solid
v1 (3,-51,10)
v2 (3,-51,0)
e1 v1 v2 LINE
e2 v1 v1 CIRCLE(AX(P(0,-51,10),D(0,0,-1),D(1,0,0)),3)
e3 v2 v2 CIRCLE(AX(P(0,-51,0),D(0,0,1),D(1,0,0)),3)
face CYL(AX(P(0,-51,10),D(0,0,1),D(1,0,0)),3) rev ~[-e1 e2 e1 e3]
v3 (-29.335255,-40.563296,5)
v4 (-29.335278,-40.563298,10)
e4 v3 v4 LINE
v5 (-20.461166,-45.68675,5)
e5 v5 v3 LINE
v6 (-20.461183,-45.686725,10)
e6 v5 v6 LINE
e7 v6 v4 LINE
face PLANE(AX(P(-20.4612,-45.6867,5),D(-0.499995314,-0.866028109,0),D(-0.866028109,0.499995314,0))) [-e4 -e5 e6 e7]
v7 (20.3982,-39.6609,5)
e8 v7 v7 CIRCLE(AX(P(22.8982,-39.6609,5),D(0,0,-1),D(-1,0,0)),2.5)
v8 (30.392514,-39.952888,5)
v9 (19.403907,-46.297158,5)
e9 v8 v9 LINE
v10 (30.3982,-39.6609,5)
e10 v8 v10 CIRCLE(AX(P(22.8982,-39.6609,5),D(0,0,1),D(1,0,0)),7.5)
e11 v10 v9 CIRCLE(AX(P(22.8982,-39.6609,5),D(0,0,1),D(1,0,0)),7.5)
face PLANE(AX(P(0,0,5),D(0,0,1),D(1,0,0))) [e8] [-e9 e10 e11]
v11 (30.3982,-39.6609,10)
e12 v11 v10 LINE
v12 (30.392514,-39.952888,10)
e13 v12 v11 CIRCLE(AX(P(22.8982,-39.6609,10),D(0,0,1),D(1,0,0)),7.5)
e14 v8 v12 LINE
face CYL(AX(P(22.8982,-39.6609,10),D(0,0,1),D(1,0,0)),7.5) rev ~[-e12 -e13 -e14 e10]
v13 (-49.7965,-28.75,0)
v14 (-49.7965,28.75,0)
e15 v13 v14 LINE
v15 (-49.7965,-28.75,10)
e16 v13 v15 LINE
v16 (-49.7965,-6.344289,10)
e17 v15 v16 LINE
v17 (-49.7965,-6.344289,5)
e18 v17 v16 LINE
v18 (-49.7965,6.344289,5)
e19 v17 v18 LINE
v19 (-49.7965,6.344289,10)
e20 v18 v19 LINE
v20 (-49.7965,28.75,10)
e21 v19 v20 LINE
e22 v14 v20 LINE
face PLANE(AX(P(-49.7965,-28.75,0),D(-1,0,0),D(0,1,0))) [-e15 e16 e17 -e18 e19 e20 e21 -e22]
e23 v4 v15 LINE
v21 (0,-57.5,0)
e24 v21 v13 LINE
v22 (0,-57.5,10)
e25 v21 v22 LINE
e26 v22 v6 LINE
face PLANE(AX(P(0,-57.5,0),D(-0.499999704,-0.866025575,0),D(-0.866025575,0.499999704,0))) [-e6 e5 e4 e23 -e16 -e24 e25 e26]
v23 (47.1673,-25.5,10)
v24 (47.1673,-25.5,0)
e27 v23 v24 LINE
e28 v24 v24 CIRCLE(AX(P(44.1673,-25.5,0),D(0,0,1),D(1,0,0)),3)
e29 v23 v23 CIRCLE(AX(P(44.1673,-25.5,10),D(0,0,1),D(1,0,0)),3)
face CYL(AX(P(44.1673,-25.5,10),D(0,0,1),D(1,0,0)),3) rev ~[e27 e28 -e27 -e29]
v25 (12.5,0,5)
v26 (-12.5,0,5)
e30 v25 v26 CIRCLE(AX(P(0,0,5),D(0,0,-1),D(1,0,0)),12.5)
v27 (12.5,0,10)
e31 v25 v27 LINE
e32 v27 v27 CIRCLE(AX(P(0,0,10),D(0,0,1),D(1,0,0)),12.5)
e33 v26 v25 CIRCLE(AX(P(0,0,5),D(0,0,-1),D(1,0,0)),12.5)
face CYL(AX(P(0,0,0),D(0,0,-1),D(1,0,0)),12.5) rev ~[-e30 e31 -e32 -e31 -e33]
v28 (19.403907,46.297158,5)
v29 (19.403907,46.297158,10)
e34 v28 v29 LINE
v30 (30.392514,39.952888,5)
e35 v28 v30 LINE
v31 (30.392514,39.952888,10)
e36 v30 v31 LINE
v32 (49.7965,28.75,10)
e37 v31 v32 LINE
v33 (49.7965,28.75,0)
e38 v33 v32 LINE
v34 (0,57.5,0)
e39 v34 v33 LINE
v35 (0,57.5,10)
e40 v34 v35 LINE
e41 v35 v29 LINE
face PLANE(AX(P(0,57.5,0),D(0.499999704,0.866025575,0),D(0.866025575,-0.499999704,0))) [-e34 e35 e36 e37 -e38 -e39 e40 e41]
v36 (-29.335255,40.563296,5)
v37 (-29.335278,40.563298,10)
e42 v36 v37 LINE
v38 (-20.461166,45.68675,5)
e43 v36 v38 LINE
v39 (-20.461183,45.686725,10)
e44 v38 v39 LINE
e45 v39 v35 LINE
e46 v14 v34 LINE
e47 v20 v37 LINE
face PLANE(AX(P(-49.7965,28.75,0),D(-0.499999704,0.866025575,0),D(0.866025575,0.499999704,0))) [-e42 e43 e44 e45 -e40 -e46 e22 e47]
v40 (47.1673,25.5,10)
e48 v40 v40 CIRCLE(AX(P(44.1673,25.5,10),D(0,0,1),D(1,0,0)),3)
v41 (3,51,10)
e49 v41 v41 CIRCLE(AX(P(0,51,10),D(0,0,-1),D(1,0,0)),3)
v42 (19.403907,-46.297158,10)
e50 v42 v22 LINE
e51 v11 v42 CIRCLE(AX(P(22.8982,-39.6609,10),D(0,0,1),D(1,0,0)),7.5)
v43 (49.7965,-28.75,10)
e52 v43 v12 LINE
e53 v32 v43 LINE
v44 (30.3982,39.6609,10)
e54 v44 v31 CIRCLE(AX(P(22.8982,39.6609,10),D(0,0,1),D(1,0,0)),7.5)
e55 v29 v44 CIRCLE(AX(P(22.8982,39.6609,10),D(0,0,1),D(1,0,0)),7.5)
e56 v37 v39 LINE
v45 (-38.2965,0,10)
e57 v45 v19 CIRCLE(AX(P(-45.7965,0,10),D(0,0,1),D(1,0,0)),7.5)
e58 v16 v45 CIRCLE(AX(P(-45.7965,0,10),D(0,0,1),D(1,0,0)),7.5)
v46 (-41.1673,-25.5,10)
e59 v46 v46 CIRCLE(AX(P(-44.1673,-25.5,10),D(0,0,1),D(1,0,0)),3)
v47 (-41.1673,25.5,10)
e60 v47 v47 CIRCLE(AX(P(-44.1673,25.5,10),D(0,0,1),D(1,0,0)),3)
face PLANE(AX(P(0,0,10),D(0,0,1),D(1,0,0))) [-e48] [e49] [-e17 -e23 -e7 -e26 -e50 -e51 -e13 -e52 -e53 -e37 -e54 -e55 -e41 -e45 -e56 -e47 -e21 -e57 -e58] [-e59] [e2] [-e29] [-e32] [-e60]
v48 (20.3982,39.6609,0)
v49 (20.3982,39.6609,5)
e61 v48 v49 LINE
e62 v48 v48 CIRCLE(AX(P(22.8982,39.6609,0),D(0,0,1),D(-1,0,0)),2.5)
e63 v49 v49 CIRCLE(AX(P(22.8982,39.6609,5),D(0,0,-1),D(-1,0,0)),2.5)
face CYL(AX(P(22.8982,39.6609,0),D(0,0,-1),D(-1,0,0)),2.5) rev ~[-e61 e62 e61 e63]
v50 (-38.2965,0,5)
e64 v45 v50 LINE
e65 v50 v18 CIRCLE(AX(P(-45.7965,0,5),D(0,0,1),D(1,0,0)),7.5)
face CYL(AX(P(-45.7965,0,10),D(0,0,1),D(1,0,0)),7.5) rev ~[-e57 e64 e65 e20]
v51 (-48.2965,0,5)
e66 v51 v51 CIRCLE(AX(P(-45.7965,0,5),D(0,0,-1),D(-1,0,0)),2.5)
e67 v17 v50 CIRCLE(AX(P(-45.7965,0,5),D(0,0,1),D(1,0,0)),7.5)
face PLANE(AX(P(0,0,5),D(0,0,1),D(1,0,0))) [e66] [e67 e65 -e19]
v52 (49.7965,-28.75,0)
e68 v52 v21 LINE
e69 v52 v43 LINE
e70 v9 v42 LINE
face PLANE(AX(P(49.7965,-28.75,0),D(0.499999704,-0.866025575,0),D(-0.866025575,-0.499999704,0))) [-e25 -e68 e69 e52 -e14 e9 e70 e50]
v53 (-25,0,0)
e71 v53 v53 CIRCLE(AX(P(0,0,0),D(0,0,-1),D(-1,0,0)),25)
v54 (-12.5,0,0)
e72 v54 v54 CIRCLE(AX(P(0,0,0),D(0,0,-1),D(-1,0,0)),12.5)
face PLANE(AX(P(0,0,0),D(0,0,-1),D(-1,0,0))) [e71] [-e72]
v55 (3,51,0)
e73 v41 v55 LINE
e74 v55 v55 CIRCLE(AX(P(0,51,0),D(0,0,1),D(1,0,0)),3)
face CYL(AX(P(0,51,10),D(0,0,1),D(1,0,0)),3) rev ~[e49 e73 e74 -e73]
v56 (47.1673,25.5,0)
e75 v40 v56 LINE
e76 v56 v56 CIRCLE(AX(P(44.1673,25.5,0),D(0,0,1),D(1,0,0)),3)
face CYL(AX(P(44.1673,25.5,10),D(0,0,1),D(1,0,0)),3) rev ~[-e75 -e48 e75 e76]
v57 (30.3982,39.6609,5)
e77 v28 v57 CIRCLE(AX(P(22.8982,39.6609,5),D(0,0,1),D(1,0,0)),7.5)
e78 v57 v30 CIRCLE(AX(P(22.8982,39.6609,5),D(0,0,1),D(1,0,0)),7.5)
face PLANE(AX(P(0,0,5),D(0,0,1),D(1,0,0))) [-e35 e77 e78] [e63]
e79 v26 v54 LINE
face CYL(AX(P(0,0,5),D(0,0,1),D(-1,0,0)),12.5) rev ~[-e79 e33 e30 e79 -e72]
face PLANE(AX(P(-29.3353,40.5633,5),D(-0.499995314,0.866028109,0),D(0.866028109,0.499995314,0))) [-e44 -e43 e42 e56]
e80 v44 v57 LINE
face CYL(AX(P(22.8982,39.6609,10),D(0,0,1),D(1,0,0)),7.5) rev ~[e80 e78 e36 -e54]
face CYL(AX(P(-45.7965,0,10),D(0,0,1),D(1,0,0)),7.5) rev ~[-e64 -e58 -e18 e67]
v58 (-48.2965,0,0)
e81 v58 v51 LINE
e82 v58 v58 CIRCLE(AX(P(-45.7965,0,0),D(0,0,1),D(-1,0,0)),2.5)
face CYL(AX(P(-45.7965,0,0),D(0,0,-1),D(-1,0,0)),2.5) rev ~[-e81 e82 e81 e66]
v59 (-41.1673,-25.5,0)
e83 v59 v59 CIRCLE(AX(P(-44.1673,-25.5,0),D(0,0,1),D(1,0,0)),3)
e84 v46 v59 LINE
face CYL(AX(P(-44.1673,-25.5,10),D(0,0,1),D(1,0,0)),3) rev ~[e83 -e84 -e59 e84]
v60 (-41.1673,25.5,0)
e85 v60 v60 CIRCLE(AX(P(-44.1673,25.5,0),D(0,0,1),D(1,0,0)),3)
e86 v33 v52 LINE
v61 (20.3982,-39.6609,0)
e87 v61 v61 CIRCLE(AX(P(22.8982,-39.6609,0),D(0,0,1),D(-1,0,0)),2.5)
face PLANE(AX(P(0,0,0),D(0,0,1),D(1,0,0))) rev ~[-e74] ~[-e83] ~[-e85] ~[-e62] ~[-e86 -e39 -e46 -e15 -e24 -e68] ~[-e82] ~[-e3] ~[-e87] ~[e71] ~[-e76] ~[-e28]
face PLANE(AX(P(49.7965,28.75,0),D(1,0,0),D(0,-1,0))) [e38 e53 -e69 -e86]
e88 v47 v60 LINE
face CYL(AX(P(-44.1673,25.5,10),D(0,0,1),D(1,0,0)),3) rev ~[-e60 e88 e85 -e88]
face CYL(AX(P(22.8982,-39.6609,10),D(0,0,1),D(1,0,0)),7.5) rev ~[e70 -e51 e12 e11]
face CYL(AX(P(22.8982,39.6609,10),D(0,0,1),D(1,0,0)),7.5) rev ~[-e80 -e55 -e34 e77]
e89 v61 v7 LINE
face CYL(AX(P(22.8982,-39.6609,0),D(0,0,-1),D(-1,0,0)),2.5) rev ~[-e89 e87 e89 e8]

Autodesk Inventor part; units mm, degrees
ref_plane "YZ Plane" through (0, 0, 0) normal (1, 0, 0) x (0, 1, 0)
ref_plane "XZ Plane" through (0, 0, 0) normal (0, 1, 0) x (-1, 0, 0)
ref_plane "XY Plane" through (0, 0, 0) normal (0, 0, 1) x (1, 0, 0)
sketch "Sketch1" plane through (0, 0, 0) normal (0, 0, 1) x (1, 0, 0)
  circle A0 centre (0, 0) radius 12.5
  circle A1 centre (-30, 0) radius 3
  circle A2 centre (-15, -25.9808) radius 3
  circle A3 centre (15, -25.9808) radius 3
  circle A4 centre (30, 0) radius 3
  circle A5 centre (15, 25.9808) radius 3
  circle A6 centre (-15, 25.9808) radius 3
  line L0 (0, 57.5) -> (49.7965, 28.75)
  line L1 (49.7965, 28.75) -> (49.7965, -28.75)
  line L2 (49.7965, -28.75) -> (0, -57.5)
  line L3 (0, -57.5) -> (-49.7965, -28.75)
  line L4 (-49.7965, -28.75) -> (-49.7965, 28.75)
  line L5 (-49.7965, 28.75) -> (0, 57.5)
  point P0 (49.7965, 0)
  dimension "d0" = 25
  dimension "d2" = 6
  dimension "d6" = 360
  dimension "d15" = 30
  dimension "d33" = 115
extrude "Extrusion1" add sketch "Sketch1" along normal blind 10 contours A1 | A2 | A3 | A4 | A5 | A6 | L0 L1 L2 L3 L4 L5
sketch "Sketch7" plane through (0, 0, 10) normal (0, 0, 1) x (1, 0, 0)
  circle A0 centre (0, 51) radius 3
  circle A1 centre (-44.1673, 25.5) radius 3
  circle A2 centre (-44.1673, -25.5) radius 3
  circle A3 centre (0, -51) radius 3
  circle A4 centre (44.1673, -25.5) radius 3
  circle A5 centre (44.1673, 25.5) radius 3
  line L0 (0, 51) -> (0, -51)
  point P0 (0, 0)
  dimension "d42" = 6
  dimension "d46" = 360
  dimension "d96" = 102
extrude "Extrusion6" cut sketch "Sketch7" against normal through all
sketch "Sketch9" plane through (0, 0, 0) normal (0, 0, -1) x (-1, 0, 0)
  circle A0 centre (0, 0) radius 25
  dimension "d56" = 50
extrude "Extrusion8" cut sketch "Sketch9" against normal blind 5
sketch "Sketch14" plane through (0, 0, 10) normal (0, 0, 1) x (1, 0, 0)
  circle A0 centre (-45.7965, 0) radius 2.5
  circle A1 centre (-22.8982, -39.6609) radius 2.5
  circle A2 centre (22.8982, -39.6609) radius 2.5
  circle A3 centre (45.7965, 0) radius 2.5
  circle A4 centre (22.8982, 39.6609) radius 2.5
  circle A5 centre (-22.8982, 39.6609) radius 2.5
  line L0 (-49.7965, 28.75) -> (-49.7965, -28.75) projected
  point P0 (0, 0)
  point P1 (-45.7965, 0)
  dimension "d81" = 5
  dimension "d85" = 360
  dimension "d97" = 4
extrude "Extrusion13" cut sketch "Sketch14" against normal through all
sketch "Sketch15" plane through (0, 0, 10) normal (0, 0, 1) x (1, 0, 0)
  circle A0 centre (-22.8982, 39.6609) radius 2.5 projected
  circle A1 centre (-22.8982, 39.6609) radius 6.5
  circle A2 centre (-45.7965, 0) radius 6.5
  circle A3 centre (-22.8982, -39.6609) radius 6.5
  circle A4 centre (22.8982, -39.6609) radius 6.5
  circle A5 centre (45.7965, 0) radius 6.5
  circle A6 centre (22.8982, 39.6609) radius 6.5
  point P0 (0, 0)
  dimension "d89" = 13
  dimension "d92" = 360
extrude "Extrusion14" cut sketch "Sketch15" against normal blind 5 contours A0 | A1 | A2 | A3 | A4 | A5 | A6
sketch "Sketch16" plane through (0, 0, 5) normal (0, 0, 1) x (1, 0, 0)
  line L0 (-29.3353, 40.5633) -> (-20.4612, 45.6867) projected
  arc A0 (-29.3353, 40.5633) -> (-20.4612, 45.6867) centre (-22.8982, 39.6609) ccw projected
  circle A1 centre (-22.8982, 39.6609) radius 2.5 projected
  line L1 (49.7965, 5.1235) -> (49.7965, -5.1235) projected
  arc A2 (49.7965, 5.1235) -> (49.7965, -5.1235) centre (45.7965, 0) ccw projected
  circle A3 centre (45.7965, 0) radius 2.5 projected
  line L2 (-20.4612, -45.6867) -> (-29.3353, -40.5633) projected
  arc A4 (-20.4612, -45.6867) -> (-29.3353, -40.5633) centre (-22.8982, -39.6609) ccw projected
  circle A5 centre (-22.8982, -39.6609) radius 2.5 projected
  point P0 (0, 0)
extrude "Extrusion15" add sketch "Sketch16" along normal blind 5
sketch "Sketch17" plane through (0, 0, 10) normal (0, 0, 1) x (1, 0, 0)
  circle A0 centre (-22.8982, 39.6609) radius 2.5 projected
  circle A1 centre (45.7965, 0) radius 2.5 projected
  circle A2 centre (-22.8982, -39.6609) radius 2.5 projected
  point P0 (0, 0)
extrude "Extrusion16" add sketch "Sketch17" against normal blind 10
sketch "Sketch18" plane through (0, 0, 5) normal (0, 0, -1) x (-1, 0, 0)
  circle A0 centre (0, 0) radius 12.5 projected
  circle A1 centre (0, 0) radius 25 projected
extrude "Extrusion17" add sketch "Sketch18" along normal blind 5
sketch "Sketch19" plane through (0, 0, 5) normal (0, 0, 1) x (1, 0, 0)
  line L0 (-49.7965, -5.1235) -> (-49.7965, 5.1235) projected
  arc A0 (-49.7965, -5.1235) -> (-49.7965, 5.1235) centre (-45.7965, 0) ccw projected
  circle A1 centre (-45.7965, 0) radius 2.5 projected
  line L1 (20.4612, 45.6867) -> (29.3353, 40.5633) projected
  arc A2 (20.4612, 45.6867) -> (29.3353, 40.5633) centre (22.8982, 39.6609) ccw projected
  circle A3 centre (22.8982, 39.6609) radius 2.5 projected
  line L2 (29.3353, -40.5633) -> (20.4612, -45.6867) projected
  arc A4 (29.3353, -40.5633) -> (20.4612, -45.6867) centre (22.8982, -39.6609) ccw projected
  circle A5 centre (22.8982, -39.6609) radius 2.5 projected
  point P0 (0, 0)
extrude "Extrusion18" add sketch "Sketch19" along normal blind 5 contours L0 A0 | A1 | L1 A2 | A3 | L2 A4 | A5
sketch "Sketch20" plane through (22.8982, 39.6609, 5) normal (0, 0, -1) x (-1, 0, 0)
  circle A0 centre (0, 0) radius 2.5 projected
  circle A1 centre (0, -79.3218) radius 2.5 projected
  circle A2 centre (68.6947, -39.6609) radius 2.5 projected
  point P0 (22.8982, -39.6609)
extrude "Extrusion19" add sketch "Sketch20" along normal blind 5
sketch "Sketch24" plane through (0, 0, 0) normal (0, 0, -1) x (-1, 0, 0)
  circle A0 centre (-22.8982, -39.6609) radius 2.5
  line L0 (-22.8982, -39.6609) -> (-24.8982, -43.125) construction
  line L1 (-49.7965, -28.75) -> (0, -57.5) projected
  circle A1 centre (22.8982, -39.6609) radius 2.5
  line L2 (22.8982, -39.6609) -> (24.8982, -43.125) construction
  circle A2 centre (45.7965, 0) radius 2.5
  line L3 (45.7965, 0) -> (49.7965, 0) construction
  circle A3 centre (22.8982, 39.6609) radius 2.5
  line L4 (22.8982, 39.6609) -> (24.8982, 43.125) construction
  circle A4 centre (-22.8982, 39.6609) radius 2.5
  line L5 (-22.8982, 39.6609) -> (-24.8982, 43.125) construction
  circle A5 centre (-45.7965, 0) radius 2.5
  line L6 (-45.7965, 0) -> (-49.7965, 0) construction
  point P0 (0, 0)
  dimension "d130" = 5
  dimension "d131" = 4
  dimension "d134" = 360
extrude "Extrusion22" cut sketch "Sketch24" against normal through all contours A0 | A2 | A4
sketch "Sketch26" plane through (0, 0, 10) normal (0, 0, 1) x (1, 0, 0)
  circle A0 centre (-45.7965, 0) radius 2.5 projected
  circle A1 centre (-45.7965, 0) radius 7.5
  circle A2 centre (22.8982, -39.6609) radius 7.5
  circle A3 centre (22.8982, 39.6609) radius 7.5
  point P0 (0, 0)
  dimension "d141" = 15
  dimension "d147" = 360
extrude "Extrusion23" cut sketch "Sketch26" against normal blind 5 contours A0 | A1 | A2 | A3
properties part number "TA01" material "ABS Plastic"
